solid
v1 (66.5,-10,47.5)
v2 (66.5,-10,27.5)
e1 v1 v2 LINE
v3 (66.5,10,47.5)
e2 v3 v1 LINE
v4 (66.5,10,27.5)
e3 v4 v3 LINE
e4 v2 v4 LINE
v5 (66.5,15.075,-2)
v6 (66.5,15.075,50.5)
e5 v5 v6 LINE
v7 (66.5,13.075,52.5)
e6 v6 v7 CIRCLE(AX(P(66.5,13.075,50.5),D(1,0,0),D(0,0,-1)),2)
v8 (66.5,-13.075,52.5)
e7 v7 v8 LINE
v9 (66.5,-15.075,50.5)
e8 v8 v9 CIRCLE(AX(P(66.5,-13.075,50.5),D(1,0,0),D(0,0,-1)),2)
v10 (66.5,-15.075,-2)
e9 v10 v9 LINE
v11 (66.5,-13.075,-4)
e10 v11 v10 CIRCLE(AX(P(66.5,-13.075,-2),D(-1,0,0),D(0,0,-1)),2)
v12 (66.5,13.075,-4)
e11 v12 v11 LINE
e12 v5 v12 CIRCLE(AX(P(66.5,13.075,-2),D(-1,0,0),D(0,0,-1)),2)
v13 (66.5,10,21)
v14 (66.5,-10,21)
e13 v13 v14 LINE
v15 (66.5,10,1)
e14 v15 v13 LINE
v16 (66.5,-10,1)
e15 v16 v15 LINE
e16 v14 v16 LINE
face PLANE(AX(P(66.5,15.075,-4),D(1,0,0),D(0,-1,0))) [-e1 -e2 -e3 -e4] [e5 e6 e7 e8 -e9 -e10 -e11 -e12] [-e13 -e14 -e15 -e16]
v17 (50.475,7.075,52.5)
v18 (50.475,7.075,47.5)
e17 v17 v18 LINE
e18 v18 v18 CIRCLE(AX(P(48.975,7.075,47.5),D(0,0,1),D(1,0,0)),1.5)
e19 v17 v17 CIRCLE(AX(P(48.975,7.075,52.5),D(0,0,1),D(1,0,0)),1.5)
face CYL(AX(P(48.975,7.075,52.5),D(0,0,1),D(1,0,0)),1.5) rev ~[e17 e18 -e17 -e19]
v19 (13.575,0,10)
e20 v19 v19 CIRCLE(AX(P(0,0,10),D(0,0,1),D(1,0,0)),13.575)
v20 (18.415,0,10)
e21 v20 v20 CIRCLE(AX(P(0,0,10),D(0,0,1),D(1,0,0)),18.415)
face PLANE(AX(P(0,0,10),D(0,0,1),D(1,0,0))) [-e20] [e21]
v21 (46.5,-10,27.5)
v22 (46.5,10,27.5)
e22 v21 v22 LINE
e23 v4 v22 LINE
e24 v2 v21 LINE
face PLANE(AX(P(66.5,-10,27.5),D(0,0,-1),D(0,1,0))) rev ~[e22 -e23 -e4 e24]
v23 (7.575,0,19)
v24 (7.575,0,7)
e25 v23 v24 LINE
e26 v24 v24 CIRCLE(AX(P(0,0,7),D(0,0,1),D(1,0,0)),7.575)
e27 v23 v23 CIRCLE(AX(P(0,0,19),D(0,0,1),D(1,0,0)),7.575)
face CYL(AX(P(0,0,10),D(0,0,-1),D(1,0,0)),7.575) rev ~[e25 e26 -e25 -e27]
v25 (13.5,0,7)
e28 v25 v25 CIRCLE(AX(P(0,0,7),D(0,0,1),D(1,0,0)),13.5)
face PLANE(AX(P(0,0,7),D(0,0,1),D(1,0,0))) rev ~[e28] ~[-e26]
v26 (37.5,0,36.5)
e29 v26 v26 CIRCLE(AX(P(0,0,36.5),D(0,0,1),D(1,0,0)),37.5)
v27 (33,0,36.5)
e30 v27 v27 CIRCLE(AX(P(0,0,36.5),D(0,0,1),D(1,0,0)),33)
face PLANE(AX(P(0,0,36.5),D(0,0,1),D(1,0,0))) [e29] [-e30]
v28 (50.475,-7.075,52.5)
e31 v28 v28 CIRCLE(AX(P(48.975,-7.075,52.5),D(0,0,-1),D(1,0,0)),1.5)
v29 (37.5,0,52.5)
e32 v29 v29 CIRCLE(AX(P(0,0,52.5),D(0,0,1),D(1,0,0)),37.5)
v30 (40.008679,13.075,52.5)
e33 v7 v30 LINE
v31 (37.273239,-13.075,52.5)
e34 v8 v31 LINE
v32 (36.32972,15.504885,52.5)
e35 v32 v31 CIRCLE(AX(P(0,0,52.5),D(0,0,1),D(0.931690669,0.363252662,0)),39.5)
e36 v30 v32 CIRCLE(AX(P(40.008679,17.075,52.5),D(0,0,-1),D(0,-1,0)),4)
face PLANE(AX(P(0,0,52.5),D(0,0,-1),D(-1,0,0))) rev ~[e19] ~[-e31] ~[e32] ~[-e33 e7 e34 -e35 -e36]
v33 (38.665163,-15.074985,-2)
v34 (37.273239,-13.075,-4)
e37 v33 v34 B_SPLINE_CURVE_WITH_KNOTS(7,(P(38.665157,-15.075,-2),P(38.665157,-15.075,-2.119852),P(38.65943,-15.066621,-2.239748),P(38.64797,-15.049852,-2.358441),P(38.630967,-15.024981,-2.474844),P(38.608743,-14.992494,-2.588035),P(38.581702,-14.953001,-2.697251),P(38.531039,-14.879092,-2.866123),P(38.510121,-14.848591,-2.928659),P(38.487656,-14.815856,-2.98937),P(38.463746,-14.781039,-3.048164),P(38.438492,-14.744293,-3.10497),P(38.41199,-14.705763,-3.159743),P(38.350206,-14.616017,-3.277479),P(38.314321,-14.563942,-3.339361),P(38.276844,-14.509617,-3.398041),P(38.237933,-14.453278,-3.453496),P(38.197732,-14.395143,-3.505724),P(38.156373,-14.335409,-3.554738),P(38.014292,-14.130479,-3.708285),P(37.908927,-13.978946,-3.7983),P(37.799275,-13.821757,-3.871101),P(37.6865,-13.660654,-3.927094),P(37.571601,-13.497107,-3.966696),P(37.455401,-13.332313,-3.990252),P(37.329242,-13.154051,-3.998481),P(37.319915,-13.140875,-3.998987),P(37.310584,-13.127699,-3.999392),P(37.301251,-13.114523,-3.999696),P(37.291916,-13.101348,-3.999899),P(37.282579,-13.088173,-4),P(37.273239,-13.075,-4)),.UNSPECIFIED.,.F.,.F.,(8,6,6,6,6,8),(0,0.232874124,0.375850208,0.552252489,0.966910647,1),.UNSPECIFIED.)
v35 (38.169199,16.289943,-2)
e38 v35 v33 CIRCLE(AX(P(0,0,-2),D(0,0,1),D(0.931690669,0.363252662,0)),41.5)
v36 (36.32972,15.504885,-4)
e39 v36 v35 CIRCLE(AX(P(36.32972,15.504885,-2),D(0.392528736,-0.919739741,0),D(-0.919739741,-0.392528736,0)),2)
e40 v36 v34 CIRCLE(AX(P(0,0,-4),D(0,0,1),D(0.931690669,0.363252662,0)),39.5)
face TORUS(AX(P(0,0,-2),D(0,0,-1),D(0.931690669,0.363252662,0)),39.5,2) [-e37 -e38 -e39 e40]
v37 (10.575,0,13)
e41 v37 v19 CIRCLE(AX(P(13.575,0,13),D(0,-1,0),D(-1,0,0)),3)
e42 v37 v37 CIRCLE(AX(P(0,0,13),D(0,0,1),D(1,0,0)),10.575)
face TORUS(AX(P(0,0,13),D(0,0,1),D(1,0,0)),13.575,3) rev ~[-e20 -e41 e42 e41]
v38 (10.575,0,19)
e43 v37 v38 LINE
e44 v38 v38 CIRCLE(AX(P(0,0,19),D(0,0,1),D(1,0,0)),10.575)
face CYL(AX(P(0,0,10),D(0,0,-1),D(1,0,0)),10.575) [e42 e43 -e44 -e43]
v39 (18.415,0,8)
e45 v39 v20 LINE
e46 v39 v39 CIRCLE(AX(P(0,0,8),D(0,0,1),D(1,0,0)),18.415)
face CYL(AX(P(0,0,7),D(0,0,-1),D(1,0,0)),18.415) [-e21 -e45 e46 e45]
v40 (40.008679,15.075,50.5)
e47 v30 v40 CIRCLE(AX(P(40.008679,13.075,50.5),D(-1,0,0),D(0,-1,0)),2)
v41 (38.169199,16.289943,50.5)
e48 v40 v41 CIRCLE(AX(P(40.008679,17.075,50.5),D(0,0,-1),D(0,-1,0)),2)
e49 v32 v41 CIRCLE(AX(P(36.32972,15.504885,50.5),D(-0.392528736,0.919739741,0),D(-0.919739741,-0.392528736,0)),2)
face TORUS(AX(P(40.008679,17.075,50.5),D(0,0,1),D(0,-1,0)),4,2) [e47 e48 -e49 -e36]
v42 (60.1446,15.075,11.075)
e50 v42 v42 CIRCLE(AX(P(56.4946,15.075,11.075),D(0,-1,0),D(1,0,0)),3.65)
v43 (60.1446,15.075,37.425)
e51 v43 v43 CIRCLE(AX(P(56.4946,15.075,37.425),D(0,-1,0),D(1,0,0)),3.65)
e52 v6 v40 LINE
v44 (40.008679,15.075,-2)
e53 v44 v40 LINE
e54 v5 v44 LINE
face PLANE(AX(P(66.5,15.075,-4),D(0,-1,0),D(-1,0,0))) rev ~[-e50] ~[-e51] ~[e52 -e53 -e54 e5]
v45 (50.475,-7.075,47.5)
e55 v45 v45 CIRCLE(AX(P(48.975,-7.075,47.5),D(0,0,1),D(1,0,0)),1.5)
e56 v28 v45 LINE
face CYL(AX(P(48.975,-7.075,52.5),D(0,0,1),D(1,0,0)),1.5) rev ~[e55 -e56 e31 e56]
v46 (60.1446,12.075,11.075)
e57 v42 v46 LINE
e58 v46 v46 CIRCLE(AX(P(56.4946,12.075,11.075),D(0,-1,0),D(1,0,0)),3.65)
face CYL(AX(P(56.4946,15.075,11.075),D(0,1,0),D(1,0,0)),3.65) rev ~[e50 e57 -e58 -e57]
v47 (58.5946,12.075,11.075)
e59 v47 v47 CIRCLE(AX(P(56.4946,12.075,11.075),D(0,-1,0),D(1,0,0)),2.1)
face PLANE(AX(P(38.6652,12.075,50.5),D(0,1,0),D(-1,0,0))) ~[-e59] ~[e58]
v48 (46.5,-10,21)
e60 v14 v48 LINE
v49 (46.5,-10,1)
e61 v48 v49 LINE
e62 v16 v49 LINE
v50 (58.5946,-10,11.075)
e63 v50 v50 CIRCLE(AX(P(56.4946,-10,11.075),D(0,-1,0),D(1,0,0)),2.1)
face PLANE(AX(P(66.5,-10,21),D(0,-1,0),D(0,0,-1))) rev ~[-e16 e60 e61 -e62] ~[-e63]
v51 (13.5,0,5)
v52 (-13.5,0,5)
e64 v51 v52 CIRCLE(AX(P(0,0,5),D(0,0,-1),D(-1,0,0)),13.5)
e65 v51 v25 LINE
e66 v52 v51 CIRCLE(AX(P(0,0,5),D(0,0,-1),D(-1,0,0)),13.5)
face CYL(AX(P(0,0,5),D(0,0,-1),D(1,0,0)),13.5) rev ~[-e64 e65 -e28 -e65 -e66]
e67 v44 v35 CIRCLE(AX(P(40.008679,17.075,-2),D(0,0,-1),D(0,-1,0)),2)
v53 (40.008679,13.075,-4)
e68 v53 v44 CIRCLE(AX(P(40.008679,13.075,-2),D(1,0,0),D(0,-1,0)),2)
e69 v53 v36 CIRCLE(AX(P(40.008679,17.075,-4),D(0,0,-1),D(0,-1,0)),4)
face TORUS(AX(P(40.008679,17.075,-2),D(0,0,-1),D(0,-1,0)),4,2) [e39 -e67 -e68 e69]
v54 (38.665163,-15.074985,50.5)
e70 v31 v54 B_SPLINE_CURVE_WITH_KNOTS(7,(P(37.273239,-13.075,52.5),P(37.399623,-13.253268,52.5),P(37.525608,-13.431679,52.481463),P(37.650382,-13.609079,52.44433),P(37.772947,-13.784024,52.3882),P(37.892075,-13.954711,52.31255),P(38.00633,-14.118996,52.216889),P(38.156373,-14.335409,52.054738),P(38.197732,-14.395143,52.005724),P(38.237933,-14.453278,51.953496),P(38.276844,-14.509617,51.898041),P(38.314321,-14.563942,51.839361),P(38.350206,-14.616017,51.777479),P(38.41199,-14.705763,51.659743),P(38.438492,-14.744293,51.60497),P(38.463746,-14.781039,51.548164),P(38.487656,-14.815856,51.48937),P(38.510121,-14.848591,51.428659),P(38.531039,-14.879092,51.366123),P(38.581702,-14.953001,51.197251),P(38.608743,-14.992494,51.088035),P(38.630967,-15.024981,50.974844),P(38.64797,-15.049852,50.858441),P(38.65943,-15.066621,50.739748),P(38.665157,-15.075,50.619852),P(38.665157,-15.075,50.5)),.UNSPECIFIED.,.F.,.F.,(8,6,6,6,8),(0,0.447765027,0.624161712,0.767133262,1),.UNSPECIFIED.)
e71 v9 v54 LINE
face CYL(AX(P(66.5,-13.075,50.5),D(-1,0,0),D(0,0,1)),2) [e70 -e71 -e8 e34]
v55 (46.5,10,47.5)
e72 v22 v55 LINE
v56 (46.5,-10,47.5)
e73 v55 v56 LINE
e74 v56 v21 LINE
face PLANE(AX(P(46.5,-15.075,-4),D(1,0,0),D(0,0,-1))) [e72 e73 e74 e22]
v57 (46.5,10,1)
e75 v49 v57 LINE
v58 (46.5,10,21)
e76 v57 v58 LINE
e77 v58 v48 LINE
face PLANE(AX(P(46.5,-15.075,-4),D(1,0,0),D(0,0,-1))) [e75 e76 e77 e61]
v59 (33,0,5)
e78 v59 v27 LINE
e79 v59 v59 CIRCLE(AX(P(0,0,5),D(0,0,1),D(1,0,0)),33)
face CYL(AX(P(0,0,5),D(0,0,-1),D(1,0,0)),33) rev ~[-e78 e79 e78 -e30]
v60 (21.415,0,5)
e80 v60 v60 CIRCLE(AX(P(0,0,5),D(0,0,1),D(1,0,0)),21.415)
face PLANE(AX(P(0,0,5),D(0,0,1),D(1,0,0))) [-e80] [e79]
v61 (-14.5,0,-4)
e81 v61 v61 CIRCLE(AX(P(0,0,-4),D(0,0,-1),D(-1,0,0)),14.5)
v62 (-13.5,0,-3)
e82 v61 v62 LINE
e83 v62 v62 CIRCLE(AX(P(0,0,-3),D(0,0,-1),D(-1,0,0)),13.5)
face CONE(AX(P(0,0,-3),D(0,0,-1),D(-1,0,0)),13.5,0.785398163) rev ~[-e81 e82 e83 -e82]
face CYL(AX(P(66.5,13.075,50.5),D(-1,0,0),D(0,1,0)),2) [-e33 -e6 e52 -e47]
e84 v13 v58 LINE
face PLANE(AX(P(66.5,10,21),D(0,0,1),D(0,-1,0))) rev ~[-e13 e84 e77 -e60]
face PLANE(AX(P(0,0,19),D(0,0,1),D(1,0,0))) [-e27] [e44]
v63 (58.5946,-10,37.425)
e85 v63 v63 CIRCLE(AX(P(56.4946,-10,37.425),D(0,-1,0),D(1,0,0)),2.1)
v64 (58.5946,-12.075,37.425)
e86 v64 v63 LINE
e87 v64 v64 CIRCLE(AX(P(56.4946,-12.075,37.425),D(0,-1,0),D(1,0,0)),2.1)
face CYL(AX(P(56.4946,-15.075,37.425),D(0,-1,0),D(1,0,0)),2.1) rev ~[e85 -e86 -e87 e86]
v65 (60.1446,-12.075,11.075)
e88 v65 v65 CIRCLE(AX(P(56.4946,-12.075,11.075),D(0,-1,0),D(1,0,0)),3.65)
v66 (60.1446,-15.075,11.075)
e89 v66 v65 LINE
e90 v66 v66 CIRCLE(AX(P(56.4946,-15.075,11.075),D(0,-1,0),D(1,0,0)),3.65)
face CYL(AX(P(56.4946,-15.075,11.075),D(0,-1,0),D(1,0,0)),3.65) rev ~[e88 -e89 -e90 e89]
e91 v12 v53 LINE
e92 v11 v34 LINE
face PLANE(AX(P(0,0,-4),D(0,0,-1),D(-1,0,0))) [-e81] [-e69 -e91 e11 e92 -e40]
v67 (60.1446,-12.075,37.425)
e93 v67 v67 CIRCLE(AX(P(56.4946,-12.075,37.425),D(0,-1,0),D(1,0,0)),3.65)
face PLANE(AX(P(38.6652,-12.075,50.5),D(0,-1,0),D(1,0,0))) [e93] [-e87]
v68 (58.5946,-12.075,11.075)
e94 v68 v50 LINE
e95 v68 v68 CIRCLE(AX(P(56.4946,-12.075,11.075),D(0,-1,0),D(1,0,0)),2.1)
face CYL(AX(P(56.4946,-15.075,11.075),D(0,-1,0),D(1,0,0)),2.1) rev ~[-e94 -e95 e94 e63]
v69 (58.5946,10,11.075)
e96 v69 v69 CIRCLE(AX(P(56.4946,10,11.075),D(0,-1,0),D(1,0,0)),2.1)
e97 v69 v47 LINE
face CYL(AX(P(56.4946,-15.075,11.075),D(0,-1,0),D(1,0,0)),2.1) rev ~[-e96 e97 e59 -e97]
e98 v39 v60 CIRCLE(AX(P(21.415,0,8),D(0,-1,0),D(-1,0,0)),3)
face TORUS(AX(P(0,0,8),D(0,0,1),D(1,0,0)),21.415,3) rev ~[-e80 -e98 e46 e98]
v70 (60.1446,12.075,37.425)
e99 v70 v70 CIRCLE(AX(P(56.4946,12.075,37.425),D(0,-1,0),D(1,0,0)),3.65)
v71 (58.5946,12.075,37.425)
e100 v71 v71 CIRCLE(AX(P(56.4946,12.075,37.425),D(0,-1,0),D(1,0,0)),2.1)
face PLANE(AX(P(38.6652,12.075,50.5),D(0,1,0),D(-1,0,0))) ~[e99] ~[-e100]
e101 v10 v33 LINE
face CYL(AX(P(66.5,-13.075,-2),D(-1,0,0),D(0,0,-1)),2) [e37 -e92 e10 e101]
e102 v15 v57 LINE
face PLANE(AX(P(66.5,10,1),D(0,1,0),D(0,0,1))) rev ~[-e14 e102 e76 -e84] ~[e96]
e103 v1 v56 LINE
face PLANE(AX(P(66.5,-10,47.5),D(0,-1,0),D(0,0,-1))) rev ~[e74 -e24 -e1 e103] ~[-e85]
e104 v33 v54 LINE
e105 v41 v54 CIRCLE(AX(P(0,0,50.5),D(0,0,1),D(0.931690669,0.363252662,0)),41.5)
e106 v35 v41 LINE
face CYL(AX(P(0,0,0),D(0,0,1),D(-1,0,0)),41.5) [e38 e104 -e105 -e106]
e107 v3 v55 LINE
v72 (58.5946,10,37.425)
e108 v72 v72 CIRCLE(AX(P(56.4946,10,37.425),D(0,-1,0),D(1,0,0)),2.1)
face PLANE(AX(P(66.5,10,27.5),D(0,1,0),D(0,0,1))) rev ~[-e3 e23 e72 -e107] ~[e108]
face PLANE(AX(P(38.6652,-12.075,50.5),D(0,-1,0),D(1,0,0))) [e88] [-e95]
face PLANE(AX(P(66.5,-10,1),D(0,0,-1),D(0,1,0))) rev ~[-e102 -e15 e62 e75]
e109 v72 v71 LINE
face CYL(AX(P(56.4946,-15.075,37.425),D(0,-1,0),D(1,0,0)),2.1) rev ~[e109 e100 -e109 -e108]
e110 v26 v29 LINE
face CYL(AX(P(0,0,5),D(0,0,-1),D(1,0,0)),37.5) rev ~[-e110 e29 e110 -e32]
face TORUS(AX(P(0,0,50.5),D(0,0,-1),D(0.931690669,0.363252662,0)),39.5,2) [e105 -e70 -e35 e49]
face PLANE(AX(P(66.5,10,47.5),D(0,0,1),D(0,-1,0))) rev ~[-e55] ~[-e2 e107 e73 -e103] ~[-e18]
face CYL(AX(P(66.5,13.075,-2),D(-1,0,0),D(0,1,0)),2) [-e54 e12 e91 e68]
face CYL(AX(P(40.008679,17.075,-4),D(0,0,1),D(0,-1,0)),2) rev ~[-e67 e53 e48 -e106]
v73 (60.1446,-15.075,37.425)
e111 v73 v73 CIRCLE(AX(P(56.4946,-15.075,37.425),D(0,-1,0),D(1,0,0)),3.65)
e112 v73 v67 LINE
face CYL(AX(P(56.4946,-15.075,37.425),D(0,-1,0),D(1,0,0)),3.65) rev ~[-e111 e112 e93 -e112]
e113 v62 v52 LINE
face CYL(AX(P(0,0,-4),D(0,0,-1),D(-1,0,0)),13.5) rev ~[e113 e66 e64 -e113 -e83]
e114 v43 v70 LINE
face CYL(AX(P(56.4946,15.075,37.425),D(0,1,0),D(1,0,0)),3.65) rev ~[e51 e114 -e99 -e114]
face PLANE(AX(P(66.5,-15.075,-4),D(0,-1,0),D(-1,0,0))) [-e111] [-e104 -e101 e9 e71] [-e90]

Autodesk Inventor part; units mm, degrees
sketch "草圖1" plane through (0, 0, 0) normal (0, 0, 1) x (1, 0, 0)
  circle A0 centre (0, 0) radius 19.6
  circle A1 centre (0, 0) radius 41.5
  dimension "d0" = 39.2
  dimension "d1" = 83
extrude "擠出1" add sketch "草圖1" along normal blind 5
sketch "草圖2" plane through (0, 0, 0) normal (0, 0, -1) x (-1, 0, 0)
  circle A0 centre (0, 0) radius 41.5 projected
extrude "擠出2" add sketch "草圖2" along normal blind 4
sketch "草圖4" plane through (0, 0, 5) normal (0, 0, 1) x (1, 0, 0)
  circle A0 centre (0, 0) radius 41.5 projected
  circle A1 centre (0, 0) radius 37.5
  dimension "d14" = 4
extrude "擠出4" add sketch "草圖4" along normal blind 47.5
sketch "草圖5" plane through (0, 0, 5) normal (0, 0, 1) x (1, 0, 0)
  circle A0 centre (0, 0) radius 37.5 projected
  circle A1 centre (0, 0) radius 33
  dimension "d17" = 4.5
extrude "擠出5" add sketch "草圖5" along normal blind 31.5
sketch "草圖6" plane through (0, 0, -4) normal (0, 0, -1) x (-1, 0, 0)
  line L0 (-66.5, 15.075) -> (-66.5, -15.075)
  line L1 (-66.5, 15.075) -> (-38.6652, 15.075)
  circle A0 centre (0, 0) radius 41.5 projected
  line L2 (-66.5, -15.075) -> (-38.6652, -15.075)
  point P0 (-41.5, 0)
  dimension "d20" = 30.15
  dimension "d22" = 15.075
  dimension "d25" = 25
extrude "擠出6" add sketch "草圖6" against normal up to surface (56.5 mm away) contours L1 A0 L2 L0
sketch "草圖7" plane through (66.5, -15.075, -4) normal (1, 0, 0) x (0, 0, -1)
  line L0 (-56.5, 30.15) -> (-56.5, 0) projected
  line L1 (0, 0) -> (-56.5, 0) projected
  line L2 (0, 30.15) -> (0, 0) projected
  line L3 (0, 30.15) -> (-56.5, 30.15) projected
  line L4 (-51.5, 5.075) -> (-31.5, 5.075)
  line L5 (-31.5, 5.075) -> (-31.5, 25.075)
  line L6 (-31.5, 25.075) -> (-51.5, 25.075)
  line L7 (-51.5, 25.075) -> (-51.5, 5.075)
  line L8 (-51.5, 5.075) -> (-31.5, 25.075) construction
  line L9 (-31.5, 5.075) -> (-51.5, 25.075) construction
  line L10 (-25, 5.075) -> (-5, 5.075)
  line L11 (-5, 5.075) -> (-5, 25.075)
  line L12 (-5, 25.075) -> (-25, 25.075)
  line L13 (-25, 25.075) -> (-25, 5.075)
  line L14 (-25, 5.075) -> (-5, 25.075) construction
  line L15 (-5, 5.075) -> (-25, 25.075) construction
  point P0 (-4, 15.075)
  point P1 (-41.5, 15.075)
  point P2 (-15, 15.075)
  dimension "d26" = 20
  dimension "d27" = 20
  dimension "d28" = 20
  dimension "d29" = 5
  dimension "d30" = 5.075
  dimension "d31" = 5
  dimension "d85" = 20
extrude "擠出7" cut sketch "草圖7" against normal blind 20 contours L7 L6 L5 L4 | L13 L12 L11 L10
fillet "圓角1" radius 2 7 edges at (52.5826, 15.075, -4) (-41.5, 0, -4) (52.5826, -15.075, -4) (38.6652, 15.075, 24.25) (52.5826, 15.075, 52.5) (-41.5, 0, 52.5) (52.5826, -15.075, 52.5)
sketch "草圖8" plane through (0, 0, 52.5) normal (0, 0, 1) x (1, 0, 0)
  line L0 (52.954, -6.0091) -> (44.994, -6.0078) projected
  line L1 (52.954, -6.0091) -> (52.955, 0.0909) projected
  line L2 (44.995, 0.0922) -> (52.955, 0.0909) projected
  line L3 (44.994, -6.0078) -> (44.995, 0.0922) projected
  circle A0 centre (48.975, -7.075) radius 1.5
  circle A1 centre (48.975, 7.075) radius 1.5
  line L4 (38.6652, -15.075) -> (66.5, -15.075) projected
  line L5 (66.5, 15.075) -> (40.0087, 15.075) projected
  point P0 (0, 0)
  dimension "d36" = 3
  dimension "d37" = 3
  dimension "d38" = 8
  dimension "d39" = 8
extrude "擠出8" cut sketch "草圖8" against normal up to surface (5 mm away) contours A0 L0 | L0 A0 | A1
sketch "草圖9" plane through (38.6652, -15.075, 50.5) normal (0, -1, 0) x (1, 0, 0)
  line L0 (27.8348, -29.5) -> (27.8348, -49.5) projected
  line L1 (27.8348, -29.5) -> (7.8348, -29.5) projected
  line L2 (7.8348, -29.5) -> (7.8348, -49.5) projected
  line L3 (27.8348, -49.5) -> (7.8348, -49.5) projected
  line L4 (27.8348, -3) -> (27.8348, -23) projected
  line L5 (27.8348, -3) -> (7.8348, -3) projected
  line L6 (7.8348, -3) -> (7.8348, -23) projected
  line L7 (27.8348, -23) -> (7.8348, -23) projected
  circle A0 centre (17.8294, -39.425) radius 2.1
  circle A1 centre (17.8294, -13.075) radius 2.1
  point P0 (-38.6652, -50.5)
  dimension "d42" = 4.2
  dimension "d43" = 4.2
extrude "擠出9" cut sketch "草圖9" against normal through all contours A0 | A1
sketch "草圖10" plane through (38.6652, -15.075, 50.5) normal (0, -1, 0) x (1, 0, 0)
  circle A0 centre (17.8294, -39.425) radius 2.1 projected
  circle A1 centre (17.8294, -39.425) radius 3.65
  circle A2 centre (17.8294, -13.075) radius 2.1 projected
  circle A3 centre (17.8294, -13.075) radius 3.65
  point P0 (-38.6652, -50.5)
  dimension "d46" = 7.3
  dimension "d47" = 7.3
extrude "擠出10" cut sketch "草圖10" against normal blind 3
mirror "鏡射1" about plane through (0, 0, 0) normal (0, 1, 0) of "擠出10"
sketch "草圖14" plane through (0, 0, 5) normal (0, 0, 1) x (1, 0, 0)
  circle A0 centre (0, 0) radius 19.6 projected
extrude "擠出13" add sketch "草圖14" against normal up to surface (9 mm away)
sketch "草圖15" plane through (0, 0, -4) normal (0, 0, -1) x (-1, 0, 0)
  circle A0 centre (0, 0) radius 13.5
  dimension "d64" = 27
extrude "擠出14" cut sketch "草圖15" against normal up to surface (9 mm away)
sketch "草圖16" plane through (0, 0, 5) normal (0, 0, 1) x (1, 0, 0)
  circle A0 centre (0, 0) radius 18.415
  circle A1 centre (0, 0) radius 13.5 projected
ref_plane "工作平面2" through (-13.4156, -13.4156, 7) normal (0, 0, 1) x (1, -0.0000484, 0)
extrude "擠出15" add sketch "草圖16" along normal up to surface (2 mm away)
ref_plane "工作平面3" through (0, 0, 7) normal (0, 0, 1) x (1, 0, 0)
sketch "草圖17" plane through (0, 0, 7) normal (0, 0, 1) x (1, 0, 0)
  circle A0 centre (0, 0) radius 7.575
  circle A1 centre (0, 0) radius 18.415 projected
  dimension "d71" = 15.15
extrude "擠出16" add sketch "草圖17" along normal blind 3
sketch "草圖18" plane through (0, 0, 10) normal (0, 0, 1) x (1, 0, 0)
  circle A0 centre (0, 0) radius 7.575 projected
  circle A1 centre (0, 0) radius 10.575
  point P0 (0, 0)
  dimension "d74" = 3
ref_plane "工作平面4" through (-7.4754, -7.4754, 19) normal (0, 0, 1) x (1, -0.0000484, 0)
extrude "擠出17" add sketch "草圖18" along normal up to surface (9 mm away)
fillet "圓角3" radius 3 2 edges at (-18.415, 0, 5) (-10.575, 0, 10)
chamfer "倒角1" distance 1 angle 45 1 edges at (13.5, 0, -4)
thread "螺紋1" size "M3x0.5" class "6H" standard "ANSI Metric M Profile" full length
thread "螺紋2" size "M3x0.5" class "6H" standard "ANSI Metric M Profile" full length
equation "\"d22\" = 0.5 * d20"
equation "\"d27\" = d26"
equation "\"d28\" = d26"
equation "\"d36\" = d37"
properties part number "j2 arm part_3D 列印"
